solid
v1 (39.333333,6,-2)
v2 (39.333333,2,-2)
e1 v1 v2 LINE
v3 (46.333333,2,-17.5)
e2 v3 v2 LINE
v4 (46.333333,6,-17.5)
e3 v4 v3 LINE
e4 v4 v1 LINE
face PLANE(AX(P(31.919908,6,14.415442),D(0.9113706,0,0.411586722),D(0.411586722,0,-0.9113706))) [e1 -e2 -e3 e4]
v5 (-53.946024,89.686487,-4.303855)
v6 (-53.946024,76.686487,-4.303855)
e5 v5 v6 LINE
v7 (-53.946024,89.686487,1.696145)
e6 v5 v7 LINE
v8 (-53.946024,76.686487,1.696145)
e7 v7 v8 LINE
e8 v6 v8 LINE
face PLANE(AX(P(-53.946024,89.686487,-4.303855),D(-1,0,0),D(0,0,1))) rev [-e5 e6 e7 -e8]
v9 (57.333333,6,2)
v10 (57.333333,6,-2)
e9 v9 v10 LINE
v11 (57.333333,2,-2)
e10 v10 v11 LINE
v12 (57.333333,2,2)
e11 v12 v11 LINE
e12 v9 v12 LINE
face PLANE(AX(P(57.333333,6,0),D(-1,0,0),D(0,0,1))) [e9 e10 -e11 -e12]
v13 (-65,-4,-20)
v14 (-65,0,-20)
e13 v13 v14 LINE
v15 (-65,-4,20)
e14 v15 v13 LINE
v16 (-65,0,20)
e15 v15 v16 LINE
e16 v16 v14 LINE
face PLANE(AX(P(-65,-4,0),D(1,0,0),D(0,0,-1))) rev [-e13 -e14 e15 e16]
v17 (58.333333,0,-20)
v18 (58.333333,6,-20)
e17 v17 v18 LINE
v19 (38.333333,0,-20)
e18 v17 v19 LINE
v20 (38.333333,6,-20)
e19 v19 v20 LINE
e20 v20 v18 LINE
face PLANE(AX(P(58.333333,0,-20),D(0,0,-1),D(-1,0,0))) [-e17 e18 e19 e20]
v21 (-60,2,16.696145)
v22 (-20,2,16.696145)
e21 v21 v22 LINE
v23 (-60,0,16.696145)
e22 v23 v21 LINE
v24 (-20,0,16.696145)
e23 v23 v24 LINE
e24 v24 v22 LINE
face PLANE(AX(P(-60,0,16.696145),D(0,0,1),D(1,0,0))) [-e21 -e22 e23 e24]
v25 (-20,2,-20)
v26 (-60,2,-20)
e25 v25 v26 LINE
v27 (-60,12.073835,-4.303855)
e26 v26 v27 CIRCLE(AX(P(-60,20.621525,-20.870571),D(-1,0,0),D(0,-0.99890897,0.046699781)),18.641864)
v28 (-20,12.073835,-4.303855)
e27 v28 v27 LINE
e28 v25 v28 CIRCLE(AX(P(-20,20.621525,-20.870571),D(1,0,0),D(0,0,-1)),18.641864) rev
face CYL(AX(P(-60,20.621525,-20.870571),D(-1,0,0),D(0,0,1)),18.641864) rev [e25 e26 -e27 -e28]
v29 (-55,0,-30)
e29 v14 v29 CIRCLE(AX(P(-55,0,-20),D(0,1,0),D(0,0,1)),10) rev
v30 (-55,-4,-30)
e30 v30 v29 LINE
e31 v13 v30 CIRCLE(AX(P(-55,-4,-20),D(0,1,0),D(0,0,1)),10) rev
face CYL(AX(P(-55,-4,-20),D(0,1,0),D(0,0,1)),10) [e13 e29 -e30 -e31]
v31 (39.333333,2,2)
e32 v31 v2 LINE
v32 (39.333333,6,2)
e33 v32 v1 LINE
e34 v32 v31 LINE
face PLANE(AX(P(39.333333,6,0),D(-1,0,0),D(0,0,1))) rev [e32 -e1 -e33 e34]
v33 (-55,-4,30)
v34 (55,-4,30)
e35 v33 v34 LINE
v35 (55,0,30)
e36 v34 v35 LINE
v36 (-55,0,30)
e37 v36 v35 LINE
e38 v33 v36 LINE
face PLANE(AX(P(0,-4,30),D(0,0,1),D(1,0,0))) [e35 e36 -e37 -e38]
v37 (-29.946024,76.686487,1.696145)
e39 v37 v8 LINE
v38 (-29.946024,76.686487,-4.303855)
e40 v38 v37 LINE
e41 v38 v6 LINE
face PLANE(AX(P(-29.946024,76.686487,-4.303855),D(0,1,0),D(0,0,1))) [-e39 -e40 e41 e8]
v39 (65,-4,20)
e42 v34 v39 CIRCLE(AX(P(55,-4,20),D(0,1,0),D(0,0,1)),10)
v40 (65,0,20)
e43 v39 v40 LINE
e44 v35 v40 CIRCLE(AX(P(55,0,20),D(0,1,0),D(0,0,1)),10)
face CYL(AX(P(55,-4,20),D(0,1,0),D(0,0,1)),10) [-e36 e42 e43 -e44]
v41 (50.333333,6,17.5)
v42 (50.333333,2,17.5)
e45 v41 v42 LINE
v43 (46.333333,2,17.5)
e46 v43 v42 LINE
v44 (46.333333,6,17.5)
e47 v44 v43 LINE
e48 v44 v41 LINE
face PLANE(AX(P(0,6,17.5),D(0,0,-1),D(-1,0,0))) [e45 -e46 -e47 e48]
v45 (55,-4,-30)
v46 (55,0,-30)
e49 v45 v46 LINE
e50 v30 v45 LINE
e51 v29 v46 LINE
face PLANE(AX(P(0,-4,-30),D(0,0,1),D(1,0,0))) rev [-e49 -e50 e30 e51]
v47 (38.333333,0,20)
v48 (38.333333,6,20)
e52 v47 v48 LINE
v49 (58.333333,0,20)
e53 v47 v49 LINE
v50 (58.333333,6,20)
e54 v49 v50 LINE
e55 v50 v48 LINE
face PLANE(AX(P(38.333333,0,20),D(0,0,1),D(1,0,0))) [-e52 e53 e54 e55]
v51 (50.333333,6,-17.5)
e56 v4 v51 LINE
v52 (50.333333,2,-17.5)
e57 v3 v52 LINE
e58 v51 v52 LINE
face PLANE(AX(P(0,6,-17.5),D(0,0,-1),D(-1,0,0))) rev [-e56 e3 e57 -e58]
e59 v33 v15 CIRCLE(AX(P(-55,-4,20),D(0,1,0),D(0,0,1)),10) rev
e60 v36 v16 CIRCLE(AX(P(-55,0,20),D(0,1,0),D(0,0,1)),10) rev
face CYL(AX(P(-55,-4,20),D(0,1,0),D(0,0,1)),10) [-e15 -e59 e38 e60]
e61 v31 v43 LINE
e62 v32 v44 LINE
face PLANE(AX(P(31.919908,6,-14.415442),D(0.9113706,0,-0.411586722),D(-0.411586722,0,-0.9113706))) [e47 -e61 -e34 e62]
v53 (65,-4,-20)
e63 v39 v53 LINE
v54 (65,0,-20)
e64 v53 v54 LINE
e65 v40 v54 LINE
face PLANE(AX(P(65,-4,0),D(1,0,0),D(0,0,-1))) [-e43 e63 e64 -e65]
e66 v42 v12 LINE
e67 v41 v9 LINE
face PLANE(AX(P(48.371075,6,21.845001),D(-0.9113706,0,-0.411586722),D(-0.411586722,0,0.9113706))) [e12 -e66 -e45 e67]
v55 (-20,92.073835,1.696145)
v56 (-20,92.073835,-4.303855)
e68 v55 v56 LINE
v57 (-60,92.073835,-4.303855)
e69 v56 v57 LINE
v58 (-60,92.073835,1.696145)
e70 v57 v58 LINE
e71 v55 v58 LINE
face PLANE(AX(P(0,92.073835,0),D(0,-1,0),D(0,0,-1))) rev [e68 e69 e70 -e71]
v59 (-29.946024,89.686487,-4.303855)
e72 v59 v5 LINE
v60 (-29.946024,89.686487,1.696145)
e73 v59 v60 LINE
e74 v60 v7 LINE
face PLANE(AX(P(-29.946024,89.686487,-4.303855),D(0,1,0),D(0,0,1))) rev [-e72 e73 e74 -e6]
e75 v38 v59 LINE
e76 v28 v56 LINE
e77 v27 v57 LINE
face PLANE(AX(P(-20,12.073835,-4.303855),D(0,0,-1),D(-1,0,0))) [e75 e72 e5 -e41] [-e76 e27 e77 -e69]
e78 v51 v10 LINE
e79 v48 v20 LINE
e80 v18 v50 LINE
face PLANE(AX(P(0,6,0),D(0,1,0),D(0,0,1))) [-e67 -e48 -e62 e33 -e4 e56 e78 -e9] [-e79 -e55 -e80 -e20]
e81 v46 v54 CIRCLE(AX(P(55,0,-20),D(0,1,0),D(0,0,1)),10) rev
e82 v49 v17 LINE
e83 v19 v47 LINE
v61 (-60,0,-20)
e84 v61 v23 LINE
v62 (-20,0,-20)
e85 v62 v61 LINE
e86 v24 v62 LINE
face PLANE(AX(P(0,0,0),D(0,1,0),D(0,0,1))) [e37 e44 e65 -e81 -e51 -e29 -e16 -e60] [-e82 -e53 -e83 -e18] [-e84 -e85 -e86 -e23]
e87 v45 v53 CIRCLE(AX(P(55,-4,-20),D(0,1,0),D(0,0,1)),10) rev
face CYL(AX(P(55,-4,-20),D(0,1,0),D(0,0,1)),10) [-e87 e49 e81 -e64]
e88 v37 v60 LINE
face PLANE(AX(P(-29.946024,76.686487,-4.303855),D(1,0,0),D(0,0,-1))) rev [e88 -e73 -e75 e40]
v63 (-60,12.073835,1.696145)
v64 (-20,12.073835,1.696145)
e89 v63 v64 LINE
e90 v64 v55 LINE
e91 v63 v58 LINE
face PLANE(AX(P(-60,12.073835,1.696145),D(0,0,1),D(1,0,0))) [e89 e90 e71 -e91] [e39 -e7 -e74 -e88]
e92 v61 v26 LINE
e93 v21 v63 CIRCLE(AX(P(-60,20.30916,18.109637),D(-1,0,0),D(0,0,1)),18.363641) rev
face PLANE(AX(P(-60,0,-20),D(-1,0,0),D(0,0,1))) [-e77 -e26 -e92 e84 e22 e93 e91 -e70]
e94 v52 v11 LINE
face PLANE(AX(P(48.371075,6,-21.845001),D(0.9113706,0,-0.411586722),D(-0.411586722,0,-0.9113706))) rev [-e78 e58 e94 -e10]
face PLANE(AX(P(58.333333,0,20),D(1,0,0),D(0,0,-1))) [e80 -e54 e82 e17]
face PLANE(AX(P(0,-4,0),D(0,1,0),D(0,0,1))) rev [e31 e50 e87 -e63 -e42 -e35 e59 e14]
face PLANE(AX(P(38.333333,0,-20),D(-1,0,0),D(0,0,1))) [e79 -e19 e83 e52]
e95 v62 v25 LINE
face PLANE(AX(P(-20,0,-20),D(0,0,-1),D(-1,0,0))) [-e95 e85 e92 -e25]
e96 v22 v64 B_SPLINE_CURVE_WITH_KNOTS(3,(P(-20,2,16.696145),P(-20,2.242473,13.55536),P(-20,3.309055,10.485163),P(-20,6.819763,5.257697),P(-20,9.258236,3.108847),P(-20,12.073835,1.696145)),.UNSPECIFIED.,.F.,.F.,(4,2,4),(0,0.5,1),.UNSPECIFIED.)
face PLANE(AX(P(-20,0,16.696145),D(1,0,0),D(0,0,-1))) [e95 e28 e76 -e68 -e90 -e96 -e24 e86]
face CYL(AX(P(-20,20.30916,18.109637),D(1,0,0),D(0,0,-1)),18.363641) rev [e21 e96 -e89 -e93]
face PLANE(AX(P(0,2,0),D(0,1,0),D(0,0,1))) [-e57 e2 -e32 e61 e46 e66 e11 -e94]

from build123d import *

# Parameters (mm, degrees)
BOSS_EXTRUDE3_DEPTH = 4
SKETCH2_W           = 40
SKETCH2_H           = 36.696145016
SKETCH2_W_2         = 20
SKETCH2_H_2         = 40
BOSS_EXTRUDE4_DEPTH = 2
LOFT8_START         = -60
LOFT8_DEPTH         = 40
SKETCH10_W          = 24
SKETCH10_H          = 13
CUT_EXTRUDE1_DEPTH  = 6
SKETCH11_W          = 20
SKETCH11_H          = 40
BOSS_EXTRUDE5_DEPTH = 4


# Read off the part's stored shape, not the designer's step: Loft8
with BuildPart() as part:
    # Sketch1 → Boss-Extrude3 (new body)
    with BuildSketch(Plane(origin=(0, 0, 0), x_dir=(1, 0, 0), z_dir=(0, 1, 0))):
        with BuildLine():
            Line((-55, -30), (55, -30))
            ThreePointArc((55, -30), (62.071067812, -27.071067812), (65, -20))
            Line((65, -20), (65, 20))
            ThreePointArc((65, 20), (62.071067812, 27.071067812), (55, 30))
            Line((55, 30), (-55, 30))
            ThreePointArc((-55, 30), (-62.071067812, 27.071067812), (-65, 20))
            Line((-65, 20), (-65, -20))
            ThreePointArc((-65, -20), (-62.071067812, -27.071067812), (-55, -30))
        make_face()
    extrude(amount=-BOSS_EXTRUDE3_DEPTH)

    # Sketch2 → Boss-Extrude4 (add)
    with BuildSketch(Plane(origin=(0, 2, 0), x_dir=(1, 0, 0), z_dir=(0, 1, 0))):
        with Locations((-40, 1.651927492)):
            Rectangle(SKETCH2_W, SKETCH2_H)
        with Locations((48.333333333, 0)):
            Rectangle(SKETCH2_W_2, SKETCH2_H_2)
    extrude(amount=-BOSS_EXTRUDE4_DEPTH)

    # Loft8 outline → Loft8 (add)
    with BuildSketch(Plane.YZ.offset(LOFT8_START)):
        with BuildLine():
            Line((92.073834687, -4.303854984), (92.073834687, 1.696145016))
            Line((92.073834687, 1.696145016), (12.073834687, 1.696145016))
            ThreePointArc((12.073834687, 1.696145016), (5.064409277, 7.871430337), (2, 16.696145016))
            Line((2, 16.696145016), (2, -20))
            ThreePointArc((2, -20), (4.932872822, -10.801545174), (12.073834687, -4.303854984))
            Line((12.073834687, -4.303854984), (92.073834687, -4.303854984))
        make_face()
    extrude(amount=LOFT8_DEPTH)

    # Sketch10 → Cut-Extrude1 (cut)
    with BuildSketch(Plane.XY.offset(1.696145016)):
        with Locations((-41.946023743, 83.186487073)):
            Rectangle(SKETCH10_W, SKETCH10_H)
    extrude(amount=-CUT_EXTRUDE1_DEPTH, mode=Mode.SUBTRACT)

    # Sketch11 → Boss-Extrude5 (add)
    # profile 1 of 5: a face of its own
    with BuildSketch(Plane(origin=(0, 2, 0), x_dir=(1, 0, 0), z_dir=(0, 1, 0))):
        with Locations((48.333333333, 0)):
            Rectangle(SKETCH11_W, SKETCH11_H)
        Polygon((57.333333333, 2), (57.333333333, 0), (57.333333333, -2), (57.333333333, -17.5), (50.333333333, -17.5), (48.333333333, -17.5), (46.333333333, -17.5), (39.333333333, -17.5), (39.333333333, -2), (39.333333333, 0), (39.333333333, 2), (39.333333333, 17.5), (46.333333333, 17.5), (48.333333333, 17.5), (50.333333333, 17.5), (57.333333333, 17.5), align=None, mode=Mode.SUBTRACT)
    # profile 2 of 5: a face of its own
    with BuildSketch(Plane(origin=(0, 2, 0), x_dir=(1, 0, 0), z_dir=(0, 1, 0))):
        Polygon((50.333333333, 17.5), (57.333333333, 2), (57.333333333, 17.5), align=None)
    # profile 3 of 5: a face of its own
    with BuildSketch(Plane(origin=(0, 2, 0), x_dir=(1, 0, 0), z_dir=(0, 1, 0))):
        Polygon((39.333333333, 2), (46.333333333, 17.5), (39.333333333, 17.5), align=None)
    # profile 4 of 5: a face of its own
    with BuildSketch(Plane(origin=(0, 2, 0), x_dir=(1, 0, 0), z_dir=(0, 1, 0))):
        Polygon((39.333333333, -17.5), (46.333333333, -17.5), (39.333333333, -2), align=None)
    # profile 5 of 5: a face of its own
    with BuildSketch(Plane(origin=(0, 2, 0), x_dir=(1, 0, 0), z_dir=(0, 1, 0))):
        Polygon((57.333333333, -17.5), (57.333333333, -2), (50.333333333, -17.5), align=None)
    extrude(amount=BOSS_EXTRUDE5_DEPTH)


solid = part.part
